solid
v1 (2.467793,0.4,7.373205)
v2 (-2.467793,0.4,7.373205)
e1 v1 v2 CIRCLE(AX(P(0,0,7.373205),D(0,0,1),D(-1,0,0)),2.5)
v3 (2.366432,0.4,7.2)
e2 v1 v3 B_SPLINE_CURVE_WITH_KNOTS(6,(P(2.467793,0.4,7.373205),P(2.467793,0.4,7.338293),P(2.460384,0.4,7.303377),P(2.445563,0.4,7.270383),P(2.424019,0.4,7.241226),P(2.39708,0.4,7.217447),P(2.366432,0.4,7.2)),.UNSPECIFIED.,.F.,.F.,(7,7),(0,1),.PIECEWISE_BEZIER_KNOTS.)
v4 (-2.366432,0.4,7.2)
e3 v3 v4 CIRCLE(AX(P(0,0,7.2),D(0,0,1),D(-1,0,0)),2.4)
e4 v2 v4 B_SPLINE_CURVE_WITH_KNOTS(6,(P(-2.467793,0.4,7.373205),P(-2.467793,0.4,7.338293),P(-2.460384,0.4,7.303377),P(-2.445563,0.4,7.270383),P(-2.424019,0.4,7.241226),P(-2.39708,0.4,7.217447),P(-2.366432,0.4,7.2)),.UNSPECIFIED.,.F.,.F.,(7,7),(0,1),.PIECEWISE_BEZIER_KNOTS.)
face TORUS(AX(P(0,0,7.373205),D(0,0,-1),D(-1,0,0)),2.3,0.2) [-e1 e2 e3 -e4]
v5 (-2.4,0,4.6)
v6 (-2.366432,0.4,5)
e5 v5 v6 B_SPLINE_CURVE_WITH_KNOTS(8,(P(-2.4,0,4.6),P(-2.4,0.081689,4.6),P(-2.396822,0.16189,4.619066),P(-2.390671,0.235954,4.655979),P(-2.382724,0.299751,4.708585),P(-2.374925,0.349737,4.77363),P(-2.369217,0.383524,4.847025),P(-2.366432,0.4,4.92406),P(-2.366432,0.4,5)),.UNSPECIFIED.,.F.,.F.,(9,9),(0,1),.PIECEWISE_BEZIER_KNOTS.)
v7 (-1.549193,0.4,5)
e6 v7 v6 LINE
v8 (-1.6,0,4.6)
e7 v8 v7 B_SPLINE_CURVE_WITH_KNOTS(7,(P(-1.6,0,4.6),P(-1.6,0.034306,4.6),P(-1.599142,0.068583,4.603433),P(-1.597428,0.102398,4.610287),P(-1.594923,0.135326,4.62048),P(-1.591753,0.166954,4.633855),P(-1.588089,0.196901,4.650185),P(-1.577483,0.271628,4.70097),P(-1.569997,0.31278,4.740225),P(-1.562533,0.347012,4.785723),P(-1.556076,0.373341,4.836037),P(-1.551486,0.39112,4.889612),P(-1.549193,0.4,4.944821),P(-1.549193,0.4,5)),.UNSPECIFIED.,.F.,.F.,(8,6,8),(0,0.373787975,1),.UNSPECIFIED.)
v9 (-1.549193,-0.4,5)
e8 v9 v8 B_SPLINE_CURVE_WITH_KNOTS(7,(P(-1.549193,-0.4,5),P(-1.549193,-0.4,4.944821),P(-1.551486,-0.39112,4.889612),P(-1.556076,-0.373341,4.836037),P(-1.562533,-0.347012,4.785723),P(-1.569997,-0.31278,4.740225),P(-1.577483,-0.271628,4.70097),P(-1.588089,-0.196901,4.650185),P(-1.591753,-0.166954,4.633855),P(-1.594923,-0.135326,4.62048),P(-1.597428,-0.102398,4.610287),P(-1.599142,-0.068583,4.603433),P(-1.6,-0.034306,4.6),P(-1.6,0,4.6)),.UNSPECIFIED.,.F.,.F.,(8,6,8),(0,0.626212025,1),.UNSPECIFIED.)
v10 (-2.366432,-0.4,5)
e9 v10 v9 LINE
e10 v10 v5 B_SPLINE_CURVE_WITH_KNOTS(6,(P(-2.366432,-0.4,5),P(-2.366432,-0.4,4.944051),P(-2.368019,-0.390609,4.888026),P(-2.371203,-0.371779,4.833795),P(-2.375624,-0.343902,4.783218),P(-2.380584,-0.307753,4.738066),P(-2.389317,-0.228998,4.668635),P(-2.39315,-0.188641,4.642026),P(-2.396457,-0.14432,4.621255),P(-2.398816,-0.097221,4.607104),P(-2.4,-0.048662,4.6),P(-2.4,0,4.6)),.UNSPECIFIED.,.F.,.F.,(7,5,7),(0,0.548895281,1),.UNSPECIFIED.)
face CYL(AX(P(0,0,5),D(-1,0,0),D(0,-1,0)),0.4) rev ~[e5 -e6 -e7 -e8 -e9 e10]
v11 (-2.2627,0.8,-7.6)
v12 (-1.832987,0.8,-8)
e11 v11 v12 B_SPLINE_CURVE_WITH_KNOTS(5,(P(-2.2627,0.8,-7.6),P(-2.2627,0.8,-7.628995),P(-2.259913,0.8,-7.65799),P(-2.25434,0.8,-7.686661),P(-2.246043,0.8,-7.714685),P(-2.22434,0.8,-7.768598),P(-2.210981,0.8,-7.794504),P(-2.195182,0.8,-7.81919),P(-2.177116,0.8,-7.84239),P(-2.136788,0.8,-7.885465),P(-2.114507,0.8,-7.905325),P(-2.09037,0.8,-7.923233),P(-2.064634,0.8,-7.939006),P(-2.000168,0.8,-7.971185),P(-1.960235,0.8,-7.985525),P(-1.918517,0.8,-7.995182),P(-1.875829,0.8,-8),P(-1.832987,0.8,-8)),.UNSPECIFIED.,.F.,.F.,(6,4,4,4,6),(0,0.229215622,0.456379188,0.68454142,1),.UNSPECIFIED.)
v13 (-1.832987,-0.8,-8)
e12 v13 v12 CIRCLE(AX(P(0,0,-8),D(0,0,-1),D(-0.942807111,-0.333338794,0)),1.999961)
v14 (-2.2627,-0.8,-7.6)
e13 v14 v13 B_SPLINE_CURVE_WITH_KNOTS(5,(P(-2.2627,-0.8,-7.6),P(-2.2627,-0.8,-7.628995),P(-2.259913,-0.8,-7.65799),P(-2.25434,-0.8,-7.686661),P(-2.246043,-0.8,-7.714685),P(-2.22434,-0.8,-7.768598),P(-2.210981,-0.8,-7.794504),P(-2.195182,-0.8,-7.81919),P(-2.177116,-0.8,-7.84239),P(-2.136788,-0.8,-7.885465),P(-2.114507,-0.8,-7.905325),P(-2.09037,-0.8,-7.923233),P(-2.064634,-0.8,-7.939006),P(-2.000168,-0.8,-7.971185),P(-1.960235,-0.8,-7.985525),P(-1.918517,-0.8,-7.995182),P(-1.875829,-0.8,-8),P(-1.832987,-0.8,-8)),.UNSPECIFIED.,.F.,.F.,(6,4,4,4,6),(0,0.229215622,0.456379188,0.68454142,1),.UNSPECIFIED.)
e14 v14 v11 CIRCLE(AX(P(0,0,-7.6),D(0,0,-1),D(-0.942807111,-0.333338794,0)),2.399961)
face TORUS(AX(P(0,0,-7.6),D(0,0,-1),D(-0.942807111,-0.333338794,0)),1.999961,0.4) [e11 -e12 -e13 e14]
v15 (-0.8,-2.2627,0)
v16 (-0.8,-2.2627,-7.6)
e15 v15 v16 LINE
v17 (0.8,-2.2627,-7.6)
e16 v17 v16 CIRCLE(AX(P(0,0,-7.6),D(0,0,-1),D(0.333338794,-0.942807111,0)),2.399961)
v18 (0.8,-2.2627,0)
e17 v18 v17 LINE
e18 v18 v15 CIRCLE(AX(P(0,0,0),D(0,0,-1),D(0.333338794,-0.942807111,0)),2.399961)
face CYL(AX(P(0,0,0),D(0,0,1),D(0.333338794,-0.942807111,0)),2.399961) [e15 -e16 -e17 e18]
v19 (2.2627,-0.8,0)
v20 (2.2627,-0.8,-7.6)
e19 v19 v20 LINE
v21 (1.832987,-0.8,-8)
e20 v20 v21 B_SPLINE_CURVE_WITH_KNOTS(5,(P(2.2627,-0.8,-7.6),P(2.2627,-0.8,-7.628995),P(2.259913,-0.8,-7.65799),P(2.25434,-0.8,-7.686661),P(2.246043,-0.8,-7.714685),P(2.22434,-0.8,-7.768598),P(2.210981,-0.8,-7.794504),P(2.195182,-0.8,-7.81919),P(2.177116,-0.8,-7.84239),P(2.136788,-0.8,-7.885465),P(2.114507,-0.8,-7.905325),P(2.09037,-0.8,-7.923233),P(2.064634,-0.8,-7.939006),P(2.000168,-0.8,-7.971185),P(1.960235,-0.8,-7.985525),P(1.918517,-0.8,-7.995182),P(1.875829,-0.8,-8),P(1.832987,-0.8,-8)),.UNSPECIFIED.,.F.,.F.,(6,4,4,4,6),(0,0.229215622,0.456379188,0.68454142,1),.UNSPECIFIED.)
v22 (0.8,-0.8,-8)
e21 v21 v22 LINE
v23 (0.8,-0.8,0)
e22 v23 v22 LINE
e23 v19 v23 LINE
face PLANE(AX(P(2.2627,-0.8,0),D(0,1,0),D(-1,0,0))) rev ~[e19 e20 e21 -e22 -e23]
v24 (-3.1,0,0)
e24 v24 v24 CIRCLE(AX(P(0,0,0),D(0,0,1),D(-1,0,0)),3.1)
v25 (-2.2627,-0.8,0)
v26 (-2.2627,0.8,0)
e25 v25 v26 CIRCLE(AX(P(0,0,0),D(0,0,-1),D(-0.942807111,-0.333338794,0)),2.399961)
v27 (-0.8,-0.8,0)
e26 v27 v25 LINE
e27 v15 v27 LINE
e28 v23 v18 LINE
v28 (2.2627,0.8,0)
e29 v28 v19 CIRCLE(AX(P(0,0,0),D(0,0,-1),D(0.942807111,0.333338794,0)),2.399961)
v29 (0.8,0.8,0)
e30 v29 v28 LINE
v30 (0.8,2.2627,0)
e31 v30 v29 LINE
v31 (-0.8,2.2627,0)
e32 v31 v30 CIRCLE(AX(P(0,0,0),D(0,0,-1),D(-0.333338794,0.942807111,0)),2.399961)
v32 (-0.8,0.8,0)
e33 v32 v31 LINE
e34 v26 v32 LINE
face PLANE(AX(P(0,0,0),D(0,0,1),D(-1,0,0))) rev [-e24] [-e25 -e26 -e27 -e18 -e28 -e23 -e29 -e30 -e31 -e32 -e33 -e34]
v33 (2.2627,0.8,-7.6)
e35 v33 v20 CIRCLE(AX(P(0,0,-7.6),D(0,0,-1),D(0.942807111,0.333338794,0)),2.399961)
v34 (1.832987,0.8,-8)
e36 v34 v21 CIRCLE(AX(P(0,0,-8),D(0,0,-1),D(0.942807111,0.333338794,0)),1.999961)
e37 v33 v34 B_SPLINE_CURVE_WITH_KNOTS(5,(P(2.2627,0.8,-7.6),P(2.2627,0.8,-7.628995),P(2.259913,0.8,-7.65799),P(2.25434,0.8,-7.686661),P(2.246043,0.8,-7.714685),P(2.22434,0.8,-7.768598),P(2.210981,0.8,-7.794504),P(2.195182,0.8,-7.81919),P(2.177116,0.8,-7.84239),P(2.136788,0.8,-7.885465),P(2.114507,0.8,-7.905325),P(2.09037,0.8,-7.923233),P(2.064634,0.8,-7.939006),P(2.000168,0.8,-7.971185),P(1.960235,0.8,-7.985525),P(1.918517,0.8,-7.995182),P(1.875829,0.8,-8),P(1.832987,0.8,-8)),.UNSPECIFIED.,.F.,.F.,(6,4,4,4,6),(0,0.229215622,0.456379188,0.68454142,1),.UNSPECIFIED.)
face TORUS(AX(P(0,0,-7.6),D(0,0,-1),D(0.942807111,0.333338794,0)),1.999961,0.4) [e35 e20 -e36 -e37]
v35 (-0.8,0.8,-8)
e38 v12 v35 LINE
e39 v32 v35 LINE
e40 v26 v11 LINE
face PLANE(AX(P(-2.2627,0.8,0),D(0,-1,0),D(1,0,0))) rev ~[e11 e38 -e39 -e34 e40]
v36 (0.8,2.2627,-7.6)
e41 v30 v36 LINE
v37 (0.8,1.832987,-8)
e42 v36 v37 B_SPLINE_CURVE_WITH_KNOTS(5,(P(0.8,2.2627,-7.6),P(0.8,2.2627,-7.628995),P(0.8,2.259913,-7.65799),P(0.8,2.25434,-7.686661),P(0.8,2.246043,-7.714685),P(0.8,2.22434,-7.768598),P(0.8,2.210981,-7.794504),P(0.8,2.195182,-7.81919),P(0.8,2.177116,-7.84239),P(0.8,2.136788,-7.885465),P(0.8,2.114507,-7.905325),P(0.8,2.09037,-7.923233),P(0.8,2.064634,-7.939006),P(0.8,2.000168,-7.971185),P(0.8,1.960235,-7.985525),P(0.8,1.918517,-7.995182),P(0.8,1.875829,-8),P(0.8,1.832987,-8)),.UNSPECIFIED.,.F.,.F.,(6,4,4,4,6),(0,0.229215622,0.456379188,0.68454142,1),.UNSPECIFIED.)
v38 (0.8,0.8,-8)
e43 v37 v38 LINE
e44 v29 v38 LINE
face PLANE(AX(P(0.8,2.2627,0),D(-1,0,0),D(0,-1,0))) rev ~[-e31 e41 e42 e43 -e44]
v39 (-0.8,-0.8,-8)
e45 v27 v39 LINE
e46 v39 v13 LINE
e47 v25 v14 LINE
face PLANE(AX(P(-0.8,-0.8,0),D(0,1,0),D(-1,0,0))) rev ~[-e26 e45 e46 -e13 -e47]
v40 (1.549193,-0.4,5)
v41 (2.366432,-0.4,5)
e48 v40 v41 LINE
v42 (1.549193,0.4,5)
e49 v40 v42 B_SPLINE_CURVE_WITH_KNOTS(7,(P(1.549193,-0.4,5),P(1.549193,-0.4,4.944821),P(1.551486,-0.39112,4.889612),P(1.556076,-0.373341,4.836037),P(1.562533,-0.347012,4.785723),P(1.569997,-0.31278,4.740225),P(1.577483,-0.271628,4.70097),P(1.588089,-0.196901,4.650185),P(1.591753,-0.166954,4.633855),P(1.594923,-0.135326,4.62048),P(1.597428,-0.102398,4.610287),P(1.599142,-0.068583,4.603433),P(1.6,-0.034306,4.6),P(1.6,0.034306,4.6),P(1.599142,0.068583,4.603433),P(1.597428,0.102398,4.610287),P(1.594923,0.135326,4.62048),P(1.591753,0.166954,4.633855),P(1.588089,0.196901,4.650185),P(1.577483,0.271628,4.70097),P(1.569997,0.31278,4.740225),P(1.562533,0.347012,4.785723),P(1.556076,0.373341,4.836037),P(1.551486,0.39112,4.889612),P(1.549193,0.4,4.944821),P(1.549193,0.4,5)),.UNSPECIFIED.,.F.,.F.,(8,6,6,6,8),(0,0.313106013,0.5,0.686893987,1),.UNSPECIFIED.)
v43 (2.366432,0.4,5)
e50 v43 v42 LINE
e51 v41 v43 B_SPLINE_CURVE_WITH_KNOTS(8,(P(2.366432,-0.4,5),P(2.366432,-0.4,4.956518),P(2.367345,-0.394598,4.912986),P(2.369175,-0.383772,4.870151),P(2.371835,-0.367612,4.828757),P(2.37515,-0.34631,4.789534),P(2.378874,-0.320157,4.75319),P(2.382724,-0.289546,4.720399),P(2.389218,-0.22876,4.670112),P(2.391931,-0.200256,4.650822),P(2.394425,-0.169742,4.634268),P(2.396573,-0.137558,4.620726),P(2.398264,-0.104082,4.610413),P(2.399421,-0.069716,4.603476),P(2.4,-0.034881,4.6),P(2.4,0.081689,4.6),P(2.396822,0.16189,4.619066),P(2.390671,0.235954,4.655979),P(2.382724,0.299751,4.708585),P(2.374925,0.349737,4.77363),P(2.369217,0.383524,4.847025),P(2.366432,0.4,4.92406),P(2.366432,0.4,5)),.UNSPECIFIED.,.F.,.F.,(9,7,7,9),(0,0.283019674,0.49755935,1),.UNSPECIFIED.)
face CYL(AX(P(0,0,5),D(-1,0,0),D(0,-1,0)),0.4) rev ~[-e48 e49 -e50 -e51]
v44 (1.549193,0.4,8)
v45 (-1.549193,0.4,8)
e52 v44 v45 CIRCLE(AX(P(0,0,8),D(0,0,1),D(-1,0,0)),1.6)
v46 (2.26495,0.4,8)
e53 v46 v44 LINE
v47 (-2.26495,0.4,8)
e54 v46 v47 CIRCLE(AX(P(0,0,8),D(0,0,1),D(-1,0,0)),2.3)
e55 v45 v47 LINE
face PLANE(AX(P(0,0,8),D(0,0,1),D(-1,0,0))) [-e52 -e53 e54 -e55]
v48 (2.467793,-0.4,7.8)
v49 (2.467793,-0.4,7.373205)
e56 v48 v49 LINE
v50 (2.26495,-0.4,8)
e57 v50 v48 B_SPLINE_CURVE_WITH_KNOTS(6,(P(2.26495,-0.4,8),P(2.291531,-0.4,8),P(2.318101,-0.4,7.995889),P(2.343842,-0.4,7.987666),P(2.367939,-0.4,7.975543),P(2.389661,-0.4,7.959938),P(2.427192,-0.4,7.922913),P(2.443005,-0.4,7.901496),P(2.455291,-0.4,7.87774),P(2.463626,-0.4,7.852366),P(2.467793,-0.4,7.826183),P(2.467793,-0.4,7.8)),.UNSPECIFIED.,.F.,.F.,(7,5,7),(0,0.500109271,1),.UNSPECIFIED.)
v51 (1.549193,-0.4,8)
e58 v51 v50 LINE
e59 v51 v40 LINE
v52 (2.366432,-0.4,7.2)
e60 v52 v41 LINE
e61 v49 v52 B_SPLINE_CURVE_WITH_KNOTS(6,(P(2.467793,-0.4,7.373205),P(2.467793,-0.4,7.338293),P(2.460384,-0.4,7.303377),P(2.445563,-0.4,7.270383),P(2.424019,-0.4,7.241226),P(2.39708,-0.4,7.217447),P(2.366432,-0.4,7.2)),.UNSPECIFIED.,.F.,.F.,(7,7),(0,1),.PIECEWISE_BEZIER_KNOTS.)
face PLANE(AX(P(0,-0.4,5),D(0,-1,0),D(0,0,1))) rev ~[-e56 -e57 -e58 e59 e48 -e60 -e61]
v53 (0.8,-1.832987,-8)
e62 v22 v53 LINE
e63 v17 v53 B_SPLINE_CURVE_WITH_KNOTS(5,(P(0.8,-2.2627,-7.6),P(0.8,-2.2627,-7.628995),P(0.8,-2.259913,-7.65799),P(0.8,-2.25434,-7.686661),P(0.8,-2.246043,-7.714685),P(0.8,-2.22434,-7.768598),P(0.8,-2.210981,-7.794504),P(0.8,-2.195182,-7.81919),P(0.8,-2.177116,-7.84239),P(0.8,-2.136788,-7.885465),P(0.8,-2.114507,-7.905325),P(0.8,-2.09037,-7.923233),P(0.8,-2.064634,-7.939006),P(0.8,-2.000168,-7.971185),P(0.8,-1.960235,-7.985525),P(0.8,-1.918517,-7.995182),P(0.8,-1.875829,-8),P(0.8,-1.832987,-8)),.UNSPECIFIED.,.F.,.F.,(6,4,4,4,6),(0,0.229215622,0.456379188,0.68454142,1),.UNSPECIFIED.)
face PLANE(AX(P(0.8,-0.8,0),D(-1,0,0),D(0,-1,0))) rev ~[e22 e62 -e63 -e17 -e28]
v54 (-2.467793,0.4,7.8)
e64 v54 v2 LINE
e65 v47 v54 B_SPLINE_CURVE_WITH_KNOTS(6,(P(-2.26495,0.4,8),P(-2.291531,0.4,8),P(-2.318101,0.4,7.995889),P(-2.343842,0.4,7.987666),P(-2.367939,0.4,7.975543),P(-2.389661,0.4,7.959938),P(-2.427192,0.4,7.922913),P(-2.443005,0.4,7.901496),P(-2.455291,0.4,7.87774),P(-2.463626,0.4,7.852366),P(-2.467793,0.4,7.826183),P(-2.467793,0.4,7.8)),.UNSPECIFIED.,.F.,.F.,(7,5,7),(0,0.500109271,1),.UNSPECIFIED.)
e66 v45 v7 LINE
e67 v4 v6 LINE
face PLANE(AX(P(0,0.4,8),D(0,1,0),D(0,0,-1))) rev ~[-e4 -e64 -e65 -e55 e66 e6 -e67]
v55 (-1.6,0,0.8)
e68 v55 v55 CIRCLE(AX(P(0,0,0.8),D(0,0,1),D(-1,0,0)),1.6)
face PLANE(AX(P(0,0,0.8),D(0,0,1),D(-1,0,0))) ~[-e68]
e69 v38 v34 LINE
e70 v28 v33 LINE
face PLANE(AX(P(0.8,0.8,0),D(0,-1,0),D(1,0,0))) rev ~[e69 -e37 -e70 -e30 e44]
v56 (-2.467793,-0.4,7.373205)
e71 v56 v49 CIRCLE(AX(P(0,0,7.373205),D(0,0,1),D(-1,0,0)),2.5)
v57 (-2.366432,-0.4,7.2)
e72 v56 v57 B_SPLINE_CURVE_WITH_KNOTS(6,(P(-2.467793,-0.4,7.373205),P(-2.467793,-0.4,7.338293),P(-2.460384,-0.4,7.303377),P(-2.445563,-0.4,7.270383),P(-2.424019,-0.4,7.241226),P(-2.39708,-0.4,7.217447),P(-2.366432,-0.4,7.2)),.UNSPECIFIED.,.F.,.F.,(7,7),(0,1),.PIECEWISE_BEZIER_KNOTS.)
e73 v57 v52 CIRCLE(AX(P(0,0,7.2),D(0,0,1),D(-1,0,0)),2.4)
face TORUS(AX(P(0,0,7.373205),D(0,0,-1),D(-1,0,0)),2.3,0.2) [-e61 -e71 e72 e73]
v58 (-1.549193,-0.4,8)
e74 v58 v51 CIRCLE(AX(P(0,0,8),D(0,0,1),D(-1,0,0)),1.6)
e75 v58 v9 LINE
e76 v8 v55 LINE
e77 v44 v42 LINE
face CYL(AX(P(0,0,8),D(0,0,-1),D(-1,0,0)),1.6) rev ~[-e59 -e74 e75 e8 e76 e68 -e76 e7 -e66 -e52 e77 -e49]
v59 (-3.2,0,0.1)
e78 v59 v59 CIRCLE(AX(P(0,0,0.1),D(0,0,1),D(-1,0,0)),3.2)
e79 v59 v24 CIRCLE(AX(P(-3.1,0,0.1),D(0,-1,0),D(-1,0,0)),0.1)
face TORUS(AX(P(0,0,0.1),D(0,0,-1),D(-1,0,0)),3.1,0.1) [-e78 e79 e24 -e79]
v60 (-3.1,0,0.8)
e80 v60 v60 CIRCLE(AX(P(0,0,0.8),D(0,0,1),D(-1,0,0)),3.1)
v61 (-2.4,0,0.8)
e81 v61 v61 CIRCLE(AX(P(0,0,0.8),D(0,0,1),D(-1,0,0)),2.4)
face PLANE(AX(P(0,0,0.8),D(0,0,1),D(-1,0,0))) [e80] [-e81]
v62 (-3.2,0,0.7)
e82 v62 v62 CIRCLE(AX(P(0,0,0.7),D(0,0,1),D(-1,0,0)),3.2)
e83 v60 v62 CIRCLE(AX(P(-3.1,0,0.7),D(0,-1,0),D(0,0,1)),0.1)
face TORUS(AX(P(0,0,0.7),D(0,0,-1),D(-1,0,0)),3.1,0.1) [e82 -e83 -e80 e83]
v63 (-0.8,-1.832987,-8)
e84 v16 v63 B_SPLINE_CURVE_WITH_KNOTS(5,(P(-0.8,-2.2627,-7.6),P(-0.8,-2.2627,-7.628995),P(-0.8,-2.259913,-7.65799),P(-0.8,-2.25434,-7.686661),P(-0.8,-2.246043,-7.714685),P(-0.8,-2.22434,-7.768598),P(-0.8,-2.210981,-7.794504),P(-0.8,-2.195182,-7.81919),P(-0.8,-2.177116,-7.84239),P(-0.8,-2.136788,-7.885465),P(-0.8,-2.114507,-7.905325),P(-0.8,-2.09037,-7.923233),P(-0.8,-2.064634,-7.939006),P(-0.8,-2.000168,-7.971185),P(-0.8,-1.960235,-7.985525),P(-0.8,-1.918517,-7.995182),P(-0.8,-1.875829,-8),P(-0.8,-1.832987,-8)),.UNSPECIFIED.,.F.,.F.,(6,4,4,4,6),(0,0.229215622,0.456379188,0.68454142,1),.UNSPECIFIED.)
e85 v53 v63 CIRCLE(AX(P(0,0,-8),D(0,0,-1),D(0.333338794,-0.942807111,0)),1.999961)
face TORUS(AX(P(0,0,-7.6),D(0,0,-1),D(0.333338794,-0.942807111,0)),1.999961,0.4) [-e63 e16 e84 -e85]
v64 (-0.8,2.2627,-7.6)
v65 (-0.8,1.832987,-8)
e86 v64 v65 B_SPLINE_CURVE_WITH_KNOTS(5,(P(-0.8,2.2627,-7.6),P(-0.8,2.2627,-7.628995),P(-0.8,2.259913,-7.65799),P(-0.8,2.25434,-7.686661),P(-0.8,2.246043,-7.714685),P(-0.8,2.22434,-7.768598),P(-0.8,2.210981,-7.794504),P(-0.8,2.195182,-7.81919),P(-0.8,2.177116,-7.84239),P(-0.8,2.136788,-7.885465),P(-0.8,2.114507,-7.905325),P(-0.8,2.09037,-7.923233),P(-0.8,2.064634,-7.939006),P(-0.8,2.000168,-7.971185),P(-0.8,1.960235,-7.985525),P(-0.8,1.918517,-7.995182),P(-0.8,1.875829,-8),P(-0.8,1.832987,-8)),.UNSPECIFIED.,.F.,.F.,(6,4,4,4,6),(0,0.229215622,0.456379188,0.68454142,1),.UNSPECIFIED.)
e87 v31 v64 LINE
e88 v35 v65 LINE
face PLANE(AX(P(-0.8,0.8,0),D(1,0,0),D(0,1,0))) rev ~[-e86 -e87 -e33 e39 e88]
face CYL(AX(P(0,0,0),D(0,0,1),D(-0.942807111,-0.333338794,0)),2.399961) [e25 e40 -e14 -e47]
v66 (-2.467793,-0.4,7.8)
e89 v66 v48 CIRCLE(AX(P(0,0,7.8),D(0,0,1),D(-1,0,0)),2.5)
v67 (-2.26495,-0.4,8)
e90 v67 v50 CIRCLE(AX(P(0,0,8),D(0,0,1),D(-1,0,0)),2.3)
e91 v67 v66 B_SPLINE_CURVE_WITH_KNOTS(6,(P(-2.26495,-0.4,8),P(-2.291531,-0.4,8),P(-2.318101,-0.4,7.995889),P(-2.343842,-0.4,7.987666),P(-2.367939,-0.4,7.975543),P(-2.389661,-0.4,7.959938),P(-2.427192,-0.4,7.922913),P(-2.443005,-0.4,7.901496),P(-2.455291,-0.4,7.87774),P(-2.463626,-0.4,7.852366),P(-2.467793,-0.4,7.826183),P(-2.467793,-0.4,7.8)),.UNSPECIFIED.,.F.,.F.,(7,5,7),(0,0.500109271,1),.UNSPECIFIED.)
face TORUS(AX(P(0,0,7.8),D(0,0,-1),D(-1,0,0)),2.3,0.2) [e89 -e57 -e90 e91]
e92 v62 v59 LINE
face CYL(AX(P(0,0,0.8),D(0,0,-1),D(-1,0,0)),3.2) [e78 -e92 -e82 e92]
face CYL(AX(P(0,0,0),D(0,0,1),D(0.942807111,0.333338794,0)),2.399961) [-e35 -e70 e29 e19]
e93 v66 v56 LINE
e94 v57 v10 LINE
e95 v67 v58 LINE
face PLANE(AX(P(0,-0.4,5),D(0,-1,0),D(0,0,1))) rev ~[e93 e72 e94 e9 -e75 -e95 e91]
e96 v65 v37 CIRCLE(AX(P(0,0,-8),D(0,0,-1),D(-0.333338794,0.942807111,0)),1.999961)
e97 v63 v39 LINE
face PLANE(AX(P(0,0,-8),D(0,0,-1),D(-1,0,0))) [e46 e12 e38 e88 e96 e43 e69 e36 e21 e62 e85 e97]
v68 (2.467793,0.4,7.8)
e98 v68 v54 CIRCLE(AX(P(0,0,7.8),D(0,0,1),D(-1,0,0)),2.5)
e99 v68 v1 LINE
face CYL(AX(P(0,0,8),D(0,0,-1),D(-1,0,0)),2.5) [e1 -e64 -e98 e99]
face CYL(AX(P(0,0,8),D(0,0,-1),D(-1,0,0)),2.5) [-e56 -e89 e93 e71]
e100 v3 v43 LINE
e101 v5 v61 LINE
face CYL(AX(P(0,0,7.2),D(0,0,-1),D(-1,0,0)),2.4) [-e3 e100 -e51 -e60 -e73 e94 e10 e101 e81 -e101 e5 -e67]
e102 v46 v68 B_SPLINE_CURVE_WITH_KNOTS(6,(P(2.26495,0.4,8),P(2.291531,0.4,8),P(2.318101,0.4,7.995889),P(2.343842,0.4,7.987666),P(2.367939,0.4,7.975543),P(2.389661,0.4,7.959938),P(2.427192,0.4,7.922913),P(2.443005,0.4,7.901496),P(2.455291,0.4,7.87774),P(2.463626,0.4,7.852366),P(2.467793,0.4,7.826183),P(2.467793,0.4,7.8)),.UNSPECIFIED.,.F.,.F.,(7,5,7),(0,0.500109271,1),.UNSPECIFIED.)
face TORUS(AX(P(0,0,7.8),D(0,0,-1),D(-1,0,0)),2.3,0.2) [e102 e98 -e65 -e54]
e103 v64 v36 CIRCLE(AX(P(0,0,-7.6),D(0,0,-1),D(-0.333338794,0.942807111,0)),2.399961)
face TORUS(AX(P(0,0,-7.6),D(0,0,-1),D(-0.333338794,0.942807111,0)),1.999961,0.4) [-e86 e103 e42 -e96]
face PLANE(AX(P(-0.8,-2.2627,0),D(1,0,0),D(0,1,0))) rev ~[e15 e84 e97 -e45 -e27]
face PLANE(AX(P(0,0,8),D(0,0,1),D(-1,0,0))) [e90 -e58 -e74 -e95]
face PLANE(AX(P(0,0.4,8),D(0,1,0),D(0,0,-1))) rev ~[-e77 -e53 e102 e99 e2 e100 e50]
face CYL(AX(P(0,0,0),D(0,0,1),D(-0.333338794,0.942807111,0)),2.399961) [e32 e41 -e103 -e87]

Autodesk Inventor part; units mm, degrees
ref_plane "YZ Plane" through (0, 0, 0) normal (1, 0, 0) x (0, 1, 0)
ref_plane "XZ Plane" through (0, 0, 0) normal (0, 1, 0) x (-1, 0, 0)
ref_plane "XY Plane" through (0, 0, 0) normal (0, 0, 1) x (1, 0, 0)
sketch "Sketch1" plane through (0, 0, 0) normal (0, 1, 0) x (-1, 0, 0)
  line L0 (2.4, 7.2) -> (2.4, 0.8)
  line L1 (3.2, 0.8) -> (2.4, 0.8)
  line L2 (3.2, 0.8) -> (3.2, 0)
  line L3 (0, 0) -> (3.2, 0)
  line L4 (2.5, 8) -> (2.5, 7.2)
  line L5 (2.5, 8) -> (1.6, 8)
  line L6 (0, -1.6) -> (0, 9.6) projected
  line L7 (2.4, 7.2) -> (2.5, 7.2)
  line L8 (3.72, 0) -> (-0.62, 0) projected
  line L9 (0, 0) -> (0, 0.8)
  line L10 (0, 0.8) -> (1.6, 0.8)
  line L11 (1.6, 8) -> (1.6, 0.8)
  dimension "d1" = 4.8
  dimension "d2" = 5
  dimension "d6" = 8
  dimension "d7" = 0.8
  dimension "d8" = 6.4
  dimension "d9" = 0.8
  dimension "d10" = 0
  dimension "d40" = 3.2
revolve "Revolution1" add sketch "Sketch1" angle 360 about axis through (0, 0, -10) along (0, 0, 1)
fillet "Fillet1" radius 0.2 2 edges at (2.5, 0, 8) (2.5, 0, 7.2)
fillet "Fillet1" radius 0.1 2 edges at (3.2, 0, 0.8) (3.2, 0, 0)
sketch "Sketch2" plane through (0, 0, 0) normal (1, 0, 0) x (0, 1, 0)
  line L0 (-1.6, 8) -> (1.6, 8) projected
  line L1 (-0.4, 8) -> (0.4, 8)
  line L2 (0.4, 8) -> (0.4, 5)
  line L3 (-0.4, 5) -> (-0.4, 8)
  arc A0 (-0.4, 5) -> (0.4, 5) centre (0, 5) ccw
  point P0 (0, 0)
  point P1 (0, 8)
  dimension "d34" = 3.4
  dimension "d41" = 0.8
extrude "Extrusion2" cut sketch "Sketch2" along normal through all both and the other way through all
sketch "Sketch3" plane through (0, 0, 0) normal (0, 0, -1) x (-1, 0, 0)
  circle A0 centre (0, 0) radius 3.1 projected
  circle A1 centre (0, 0) radius 2.4 construction
  line L0 (-0.8, 2.2627) -> (-0.8, 0.8)
  line L1 (-0.8, 0.8) -> (-2.2627, 0.8)
  line L2 (-2.2627, -0.8) -> (-0.8, -0.8)
  line L3 (-0.8, -0.8) -> (-0.8, -2.2627)
  line L4 (0.8, -2.2627) -> (0.8, -0.8)
  line L5 (0.8, -0.8) -> (2.2627, -0.8)
  line L6 (2.2627, 0.8) -> (0.8, 0.8)
  line L7 (0.8, 0.8) -> (0.8, 2.2627)
  arc A2 (0.8, 2.2627) -> (-0.8, 2.2627) centre (0, 0) ccw
  arc A3 (-2.2627, 0.8) -> (-2.2627, -0.8) centre (0, 0) ccw
  arc A4 (-0.8, -2.2627) -> (0.8, -2.2627) centre (0, 0) ccw
  arc A5 (2.2627, -0.8) -> (2.2627, 0.8) centre (0, 0) ccw
  dimension "d35" = 4.8
  dimension "d36" = 1.6
extrude "Extrusion3" add sketch "Sketch3" along normal blind 8 contours A2 L7 L6 A5 L5 L4 A4 L3 L2 A3 L1 L0
fillet "Fillet2" radius 0.4 4 edges at (0, 2.4, -8) (2.4, 0, -8) (0, -2.4, -8) (-2.4, 0, -8)
equation "\"d1\" = kd"
equation "\"d2\" = tpcd"
equation "\"d6\" = lu"
equation "\"d7\" = d9"
equation "\"d8\" = tsd"
equation "\"d9\" = tsl"
equation "\"d40\" = rd"
equation "\"d27\" = pinf"
equation "\"d28\" = lf"
equation "\"d34\" = tpnl"
equation "\"d41\" = tpnw"
equation "\"d35\" = kd"
equation "\"d36\" = axlet"
equation "\"d37\" = lu"
equation "\"d39\" = tf"
equation "\"kd\" = 4.8"
equation "\"tpcd\" = 5"
equation "\"lu\" = 8"
equation "\"tsd\" = 6.4"
equation "\"tsl\" = 0.8"
equation "\"rd\" = 3.2"
equation "\"pinf\" = 0.2"
equation "\"lf\" = 0.1"
equation "\"tpnl\" = 3.4"
equation "\"tpnw\" = 0.8"
equation "\"axlet\" = 1.6"
equation "\"tf\" = 0.4"
properties part number "43093-Blue" material "ABS Plastic"
